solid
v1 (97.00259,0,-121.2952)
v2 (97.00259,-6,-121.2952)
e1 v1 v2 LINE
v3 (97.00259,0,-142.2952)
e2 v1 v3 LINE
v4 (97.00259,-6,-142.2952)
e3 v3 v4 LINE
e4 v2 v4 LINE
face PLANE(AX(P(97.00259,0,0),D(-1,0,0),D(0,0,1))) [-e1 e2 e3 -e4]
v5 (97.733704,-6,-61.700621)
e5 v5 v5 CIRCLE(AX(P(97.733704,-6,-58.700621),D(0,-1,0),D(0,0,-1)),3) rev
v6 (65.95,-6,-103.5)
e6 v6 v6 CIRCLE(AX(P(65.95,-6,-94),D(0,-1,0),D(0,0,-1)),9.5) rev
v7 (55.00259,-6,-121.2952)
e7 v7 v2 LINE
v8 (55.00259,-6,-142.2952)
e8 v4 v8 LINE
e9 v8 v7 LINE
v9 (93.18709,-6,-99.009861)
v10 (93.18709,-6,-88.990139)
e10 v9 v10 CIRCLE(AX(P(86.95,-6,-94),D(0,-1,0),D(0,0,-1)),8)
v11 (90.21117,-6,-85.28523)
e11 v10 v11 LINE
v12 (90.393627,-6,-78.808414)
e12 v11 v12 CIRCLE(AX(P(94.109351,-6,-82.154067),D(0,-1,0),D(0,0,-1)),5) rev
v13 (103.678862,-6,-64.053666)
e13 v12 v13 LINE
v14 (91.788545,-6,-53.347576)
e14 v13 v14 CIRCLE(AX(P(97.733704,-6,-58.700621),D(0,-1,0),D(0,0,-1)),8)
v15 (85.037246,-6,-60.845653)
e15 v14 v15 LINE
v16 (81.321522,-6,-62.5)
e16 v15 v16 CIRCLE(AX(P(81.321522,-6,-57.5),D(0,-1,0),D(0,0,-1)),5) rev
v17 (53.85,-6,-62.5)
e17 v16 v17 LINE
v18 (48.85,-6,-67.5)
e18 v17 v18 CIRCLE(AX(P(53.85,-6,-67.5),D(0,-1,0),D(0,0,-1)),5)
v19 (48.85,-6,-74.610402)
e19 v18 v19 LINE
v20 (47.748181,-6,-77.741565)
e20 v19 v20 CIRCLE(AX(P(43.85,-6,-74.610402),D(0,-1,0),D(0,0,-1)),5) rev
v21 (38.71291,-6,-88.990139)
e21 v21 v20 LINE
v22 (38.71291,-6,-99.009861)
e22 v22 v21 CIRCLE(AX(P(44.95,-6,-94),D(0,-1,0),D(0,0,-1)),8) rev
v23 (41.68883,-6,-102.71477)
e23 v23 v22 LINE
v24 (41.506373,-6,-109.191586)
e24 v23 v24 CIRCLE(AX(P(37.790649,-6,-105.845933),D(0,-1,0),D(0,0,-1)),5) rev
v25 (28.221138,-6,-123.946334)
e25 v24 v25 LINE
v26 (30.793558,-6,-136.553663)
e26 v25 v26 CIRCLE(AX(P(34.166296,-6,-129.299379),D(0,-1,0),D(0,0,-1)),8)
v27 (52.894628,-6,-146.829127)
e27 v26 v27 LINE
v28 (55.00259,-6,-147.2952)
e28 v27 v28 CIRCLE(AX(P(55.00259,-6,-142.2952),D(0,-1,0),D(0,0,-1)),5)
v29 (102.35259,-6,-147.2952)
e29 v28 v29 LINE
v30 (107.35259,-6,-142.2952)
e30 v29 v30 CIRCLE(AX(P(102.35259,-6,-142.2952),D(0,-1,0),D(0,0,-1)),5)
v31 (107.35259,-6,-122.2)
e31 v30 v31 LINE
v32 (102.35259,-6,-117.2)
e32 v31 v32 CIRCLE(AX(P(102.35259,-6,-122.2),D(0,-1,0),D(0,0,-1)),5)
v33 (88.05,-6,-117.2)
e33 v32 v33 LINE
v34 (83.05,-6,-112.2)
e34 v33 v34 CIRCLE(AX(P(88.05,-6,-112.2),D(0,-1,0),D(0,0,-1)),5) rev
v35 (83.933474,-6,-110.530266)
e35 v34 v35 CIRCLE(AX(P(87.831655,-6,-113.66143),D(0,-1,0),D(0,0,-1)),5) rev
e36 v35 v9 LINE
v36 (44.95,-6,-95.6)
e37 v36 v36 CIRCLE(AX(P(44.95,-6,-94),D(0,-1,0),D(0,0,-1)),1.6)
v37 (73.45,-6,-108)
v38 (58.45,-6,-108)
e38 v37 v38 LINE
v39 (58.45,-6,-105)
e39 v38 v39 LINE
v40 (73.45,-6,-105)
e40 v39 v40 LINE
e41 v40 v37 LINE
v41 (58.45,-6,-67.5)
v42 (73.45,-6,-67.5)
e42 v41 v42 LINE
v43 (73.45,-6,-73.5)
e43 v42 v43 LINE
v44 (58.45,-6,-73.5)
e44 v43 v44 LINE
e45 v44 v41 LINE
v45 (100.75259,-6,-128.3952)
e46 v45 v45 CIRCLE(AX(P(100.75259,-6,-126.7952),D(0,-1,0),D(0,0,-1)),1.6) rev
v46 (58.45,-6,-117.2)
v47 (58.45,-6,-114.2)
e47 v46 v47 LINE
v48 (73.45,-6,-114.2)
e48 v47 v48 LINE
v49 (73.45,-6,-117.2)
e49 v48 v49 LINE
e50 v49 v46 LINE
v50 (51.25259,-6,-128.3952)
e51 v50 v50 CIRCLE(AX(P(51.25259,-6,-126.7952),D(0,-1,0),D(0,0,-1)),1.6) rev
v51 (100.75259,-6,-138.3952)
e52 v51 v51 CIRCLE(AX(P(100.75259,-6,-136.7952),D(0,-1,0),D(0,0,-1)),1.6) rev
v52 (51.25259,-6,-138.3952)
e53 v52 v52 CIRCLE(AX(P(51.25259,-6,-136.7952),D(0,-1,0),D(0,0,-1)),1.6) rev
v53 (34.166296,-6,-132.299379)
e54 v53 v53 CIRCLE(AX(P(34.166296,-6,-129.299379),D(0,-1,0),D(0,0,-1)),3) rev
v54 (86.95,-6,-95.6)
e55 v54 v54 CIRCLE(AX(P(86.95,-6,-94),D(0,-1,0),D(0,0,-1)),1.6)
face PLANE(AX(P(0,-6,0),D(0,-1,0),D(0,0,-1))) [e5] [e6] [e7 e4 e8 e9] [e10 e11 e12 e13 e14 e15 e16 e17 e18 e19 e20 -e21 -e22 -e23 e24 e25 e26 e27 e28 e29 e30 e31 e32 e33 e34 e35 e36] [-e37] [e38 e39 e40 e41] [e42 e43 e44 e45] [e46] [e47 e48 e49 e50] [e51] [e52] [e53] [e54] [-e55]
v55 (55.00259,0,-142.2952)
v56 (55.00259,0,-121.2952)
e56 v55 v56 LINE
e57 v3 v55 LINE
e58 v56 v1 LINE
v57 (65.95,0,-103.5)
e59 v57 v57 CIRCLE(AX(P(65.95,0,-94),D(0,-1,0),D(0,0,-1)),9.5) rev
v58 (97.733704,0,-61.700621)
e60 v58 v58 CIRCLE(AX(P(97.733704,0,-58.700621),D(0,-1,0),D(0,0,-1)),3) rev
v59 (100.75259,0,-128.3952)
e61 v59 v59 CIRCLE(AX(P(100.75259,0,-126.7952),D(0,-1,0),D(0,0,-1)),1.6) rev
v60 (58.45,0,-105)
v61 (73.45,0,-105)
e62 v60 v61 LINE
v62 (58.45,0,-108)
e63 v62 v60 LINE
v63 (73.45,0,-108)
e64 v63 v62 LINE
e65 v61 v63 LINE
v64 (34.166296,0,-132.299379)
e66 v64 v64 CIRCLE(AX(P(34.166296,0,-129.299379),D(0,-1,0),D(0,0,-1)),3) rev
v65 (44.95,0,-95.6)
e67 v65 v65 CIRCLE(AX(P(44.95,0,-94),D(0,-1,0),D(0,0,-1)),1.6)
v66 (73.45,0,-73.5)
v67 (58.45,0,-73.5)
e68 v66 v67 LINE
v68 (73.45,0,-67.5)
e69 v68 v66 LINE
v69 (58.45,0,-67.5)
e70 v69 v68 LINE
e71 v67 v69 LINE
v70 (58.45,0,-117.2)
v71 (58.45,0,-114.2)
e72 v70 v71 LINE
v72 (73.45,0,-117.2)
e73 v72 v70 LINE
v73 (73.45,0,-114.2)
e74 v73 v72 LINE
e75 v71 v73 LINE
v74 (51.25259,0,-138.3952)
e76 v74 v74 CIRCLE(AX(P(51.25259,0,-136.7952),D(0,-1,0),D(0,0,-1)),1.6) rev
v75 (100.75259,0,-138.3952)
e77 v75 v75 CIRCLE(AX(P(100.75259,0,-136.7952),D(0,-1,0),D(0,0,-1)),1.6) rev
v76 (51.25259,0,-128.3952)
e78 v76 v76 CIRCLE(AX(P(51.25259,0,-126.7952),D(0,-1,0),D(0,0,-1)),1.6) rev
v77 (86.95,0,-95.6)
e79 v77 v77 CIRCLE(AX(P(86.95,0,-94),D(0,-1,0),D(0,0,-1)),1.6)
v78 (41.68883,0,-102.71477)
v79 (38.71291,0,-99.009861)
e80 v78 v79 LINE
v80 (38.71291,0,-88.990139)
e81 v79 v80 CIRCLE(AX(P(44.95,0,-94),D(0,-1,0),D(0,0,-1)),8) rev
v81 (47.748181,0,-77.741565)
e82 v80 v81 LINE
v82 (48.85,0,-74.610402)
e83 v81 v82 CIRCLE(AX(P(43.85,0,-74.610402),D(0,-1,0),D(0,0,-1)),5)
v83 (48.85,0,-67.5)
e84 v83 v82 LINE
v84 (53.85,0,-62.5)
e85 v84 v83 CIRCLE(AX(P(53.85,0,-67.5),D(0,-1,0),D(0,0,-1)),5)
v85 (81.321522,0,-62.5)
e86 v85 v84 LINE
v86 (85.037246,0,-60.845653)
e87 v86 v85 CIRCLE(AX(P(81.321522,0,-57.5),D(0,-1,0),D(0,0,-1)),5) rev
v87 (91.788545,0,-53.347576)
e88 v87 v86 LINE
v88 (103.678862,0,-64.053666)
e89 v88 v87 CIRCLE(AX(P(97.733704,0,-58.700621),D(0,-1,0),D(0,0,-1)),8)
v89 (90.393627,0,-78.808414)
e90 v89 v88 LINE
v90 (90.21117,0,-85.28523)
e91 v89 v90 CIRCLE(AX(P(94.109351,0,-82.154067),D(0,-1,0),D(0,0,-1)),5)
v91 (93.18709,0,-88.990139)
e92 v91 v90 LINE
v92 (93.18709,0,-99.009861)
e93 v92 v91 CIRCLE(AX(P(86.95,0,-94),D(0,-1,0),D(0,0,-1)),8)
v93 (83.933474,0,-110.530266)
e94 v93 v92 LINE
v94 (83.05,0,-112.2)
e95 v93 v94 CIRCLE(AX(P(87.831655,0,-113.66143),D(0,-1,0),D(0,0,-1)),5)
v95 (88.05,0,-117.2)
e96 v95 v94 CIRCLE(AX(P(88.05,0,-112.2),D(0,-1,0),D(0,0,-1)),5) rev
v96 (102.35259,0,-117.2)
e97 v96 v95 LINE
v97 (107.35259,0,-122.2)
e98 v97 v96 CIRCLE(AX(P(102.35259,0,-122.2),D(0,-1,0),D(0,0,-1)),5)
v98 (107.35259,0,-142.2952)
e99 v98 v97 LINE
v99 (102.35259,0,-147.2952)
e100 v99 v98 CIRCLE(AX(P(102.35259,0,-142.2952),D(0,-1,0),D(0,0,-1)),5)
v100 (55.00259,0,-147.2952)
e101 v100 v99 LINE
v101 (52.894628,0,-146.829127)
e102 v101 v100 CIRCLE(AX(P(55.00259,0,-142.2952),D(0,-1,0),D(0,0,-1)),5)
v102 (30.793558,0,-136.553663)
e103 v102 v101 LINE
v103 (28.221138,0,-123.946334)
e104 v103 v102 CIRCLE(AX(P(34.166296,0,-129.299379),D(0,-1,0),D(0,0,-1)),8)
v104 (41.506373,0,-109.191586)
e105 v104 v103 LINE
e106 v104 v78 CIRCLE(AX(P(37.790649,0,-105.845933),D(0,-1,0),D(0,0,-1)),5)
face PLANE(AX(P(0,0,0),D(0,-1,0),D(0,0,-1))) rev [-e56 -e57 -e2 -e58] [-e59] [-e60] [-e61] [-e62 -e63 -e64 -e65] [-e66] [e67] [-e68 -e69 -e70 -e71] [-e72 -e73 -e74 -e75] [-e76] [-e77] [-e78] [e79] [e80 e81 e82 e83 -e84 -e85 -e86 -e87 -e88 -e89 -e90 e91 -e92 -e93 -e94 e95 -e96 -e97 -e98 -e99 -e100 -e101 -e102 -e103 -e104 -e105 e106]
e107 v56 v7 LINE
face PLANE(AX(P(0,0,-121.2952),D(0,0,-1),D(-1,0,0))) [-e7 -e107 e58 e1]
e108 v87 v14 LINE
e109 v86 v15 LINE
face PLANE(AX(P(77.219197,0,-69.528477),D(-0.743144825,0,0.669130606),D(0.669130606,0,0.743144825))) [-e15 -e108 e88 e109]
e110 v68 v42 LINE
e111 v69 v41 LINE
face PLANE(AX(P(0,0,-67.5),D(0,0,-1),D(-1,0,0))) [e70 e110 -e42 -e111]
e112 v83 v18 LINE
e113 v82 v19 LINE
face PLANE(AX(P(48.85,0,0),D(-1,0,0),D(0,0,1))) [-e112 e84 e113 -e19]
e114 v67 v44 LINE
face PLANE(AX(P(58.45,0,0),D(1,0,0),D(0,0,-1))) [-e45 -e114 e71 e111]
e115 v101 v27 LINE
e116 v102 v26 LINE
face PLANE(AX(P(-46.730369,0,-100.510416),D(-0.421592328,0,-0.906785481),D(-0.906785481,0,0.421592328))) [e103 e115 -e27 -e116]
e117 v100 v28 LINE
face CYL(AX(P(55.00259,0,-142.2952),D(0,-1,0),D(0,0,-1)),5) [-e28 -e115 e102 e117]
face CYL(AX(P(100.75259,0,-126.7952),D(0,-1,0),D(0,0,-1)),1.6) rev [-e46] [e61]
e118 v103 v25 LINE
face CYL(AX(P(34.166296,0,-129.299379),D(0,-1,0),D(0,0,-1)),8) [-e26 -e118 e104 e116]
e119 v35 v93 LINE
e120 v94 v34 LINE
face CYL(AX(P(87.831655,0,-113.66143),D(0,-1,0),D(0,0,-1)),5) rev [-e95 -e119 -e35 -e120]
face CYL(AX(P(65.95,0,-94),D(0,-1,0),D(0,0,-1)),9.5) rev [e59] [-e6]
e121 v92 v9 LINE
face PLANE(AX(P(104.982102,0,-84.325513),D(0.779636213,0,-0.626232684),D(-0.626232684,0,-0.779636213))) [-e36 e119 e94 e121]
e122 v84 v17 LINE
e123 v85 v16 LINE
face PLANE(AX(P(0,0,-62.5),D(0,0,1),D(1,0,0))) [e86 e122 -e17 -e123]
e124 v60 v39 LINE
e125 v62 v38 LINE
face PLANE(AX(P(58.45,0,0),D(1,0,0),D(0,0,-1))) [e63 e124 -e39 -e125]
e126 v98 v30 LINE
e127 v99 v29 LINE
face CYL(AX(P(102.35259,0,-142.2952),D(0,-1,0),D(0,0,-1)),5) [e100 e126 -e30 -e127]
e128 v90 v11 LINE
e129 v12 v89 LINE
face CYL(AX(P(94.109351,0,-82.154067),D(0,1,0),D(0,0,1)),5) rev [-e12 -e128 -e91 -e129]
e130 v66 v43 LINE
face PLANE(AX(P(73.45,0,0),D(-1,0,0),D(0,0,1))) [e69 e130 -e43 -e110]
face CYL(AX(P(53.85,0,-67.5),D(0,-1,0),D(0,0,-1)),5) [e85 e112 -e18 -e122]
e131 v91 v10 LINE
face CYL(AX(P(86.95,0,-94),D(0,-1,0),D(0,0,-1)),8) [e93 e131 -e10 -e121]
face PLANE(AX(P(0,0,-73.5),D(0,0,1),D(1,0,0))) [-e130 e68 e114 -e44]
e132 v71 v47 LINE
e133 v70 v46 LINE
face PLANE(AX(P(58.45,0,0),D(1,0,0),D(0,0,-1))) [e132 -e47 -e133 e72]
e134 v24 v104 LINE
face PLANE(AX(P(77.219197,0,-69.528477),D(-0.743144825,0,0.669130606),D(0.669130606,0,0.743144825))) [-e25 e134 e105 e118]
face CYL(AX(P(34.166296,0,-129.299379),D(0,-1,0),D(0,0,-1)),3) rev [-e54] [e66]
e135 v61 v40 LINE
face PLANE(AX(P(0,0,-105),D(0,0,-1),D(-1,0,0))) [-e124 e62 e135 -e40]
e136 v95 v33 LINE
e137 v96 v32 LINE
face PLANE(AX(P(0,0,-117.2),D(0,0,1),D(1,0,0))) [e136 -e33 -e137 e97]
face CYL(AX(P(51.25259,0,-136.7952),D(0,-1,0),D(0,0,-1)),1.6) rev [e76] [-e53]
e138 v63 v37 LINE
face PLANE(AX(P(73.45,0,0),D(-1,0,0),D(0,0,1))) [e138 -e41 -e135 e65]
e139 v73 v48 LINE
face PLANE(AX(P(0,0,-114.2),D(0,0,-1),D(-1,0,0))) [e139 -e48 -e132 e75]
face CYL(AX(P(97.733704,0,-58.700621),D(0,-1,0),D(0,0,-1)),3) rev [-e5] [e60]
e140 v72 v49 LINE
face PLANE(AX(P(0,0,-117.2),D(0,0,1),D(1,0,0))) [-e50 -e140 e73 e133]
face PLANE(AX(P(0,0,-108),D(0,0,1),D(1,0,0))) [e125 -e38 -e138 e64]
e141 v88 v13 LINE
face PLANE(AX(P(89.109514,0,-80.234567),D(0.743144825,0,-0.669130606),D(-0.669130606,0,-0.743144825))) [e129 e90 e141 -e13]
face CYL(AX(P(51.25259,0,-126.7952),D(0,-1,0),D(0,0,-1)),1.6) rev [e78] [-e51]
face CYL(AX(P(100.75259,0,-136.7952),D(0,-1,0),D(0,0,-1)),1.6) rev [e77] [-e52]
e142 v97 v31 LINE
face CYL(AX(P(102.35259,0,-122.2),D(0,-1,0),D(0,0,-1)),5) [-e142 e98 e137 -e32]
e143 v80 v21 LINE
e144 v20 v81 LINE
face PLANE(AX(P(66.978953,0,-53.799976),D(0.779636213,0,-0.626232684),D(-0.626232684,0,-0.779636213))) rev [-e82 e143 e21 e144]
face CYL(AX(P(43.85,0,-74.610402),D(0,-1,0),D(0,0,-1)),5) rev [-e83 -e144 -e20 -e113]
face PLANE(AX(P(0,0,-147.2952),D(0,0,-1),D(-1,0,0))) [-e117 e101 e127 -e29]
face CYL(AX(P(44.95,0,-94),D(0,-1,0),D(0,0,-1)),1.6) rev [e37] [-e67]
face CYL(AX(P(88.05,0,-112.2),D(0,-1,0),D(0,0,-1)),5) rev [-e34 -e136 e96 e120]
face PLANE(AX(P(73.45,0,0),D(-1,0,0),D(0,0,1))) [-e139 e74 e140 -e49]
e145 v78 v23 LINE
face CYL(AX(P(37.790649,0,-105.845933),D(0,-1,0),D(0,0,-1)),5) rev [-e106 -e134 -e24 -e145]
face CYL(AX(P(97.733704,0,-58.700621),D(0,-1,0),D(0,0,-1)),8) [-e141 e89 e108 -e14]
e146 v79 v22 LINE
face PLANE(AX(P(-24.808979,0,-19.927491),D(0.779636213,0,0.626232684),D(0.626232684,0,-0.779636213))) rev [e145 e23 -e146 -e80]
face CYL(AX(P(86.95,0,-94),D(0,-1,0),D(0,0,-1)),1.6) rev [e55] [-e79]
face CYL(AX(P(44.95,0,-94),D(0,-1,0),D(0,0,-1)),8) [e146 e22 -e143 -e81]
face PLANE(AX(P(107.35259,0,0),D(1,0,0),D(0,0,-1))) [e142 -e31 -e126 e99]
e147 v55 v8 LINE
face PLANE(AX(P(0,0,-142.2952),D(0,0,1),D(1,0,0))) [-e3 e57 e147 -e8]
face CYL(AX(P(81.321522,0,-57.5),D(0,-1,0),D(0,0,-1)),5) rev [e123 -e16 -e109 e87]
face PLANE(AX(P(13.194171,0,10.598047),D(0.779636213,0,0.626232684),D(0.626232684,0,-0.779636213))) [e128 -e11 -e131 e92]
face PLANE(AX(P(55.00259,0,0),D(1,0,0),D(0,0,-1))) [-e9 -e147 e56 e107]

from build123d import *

# Parameters (mm, degrees)
ESBO_O1_R                = 3
ESBO_O1_R_2              = 1.6
ESBO_O1_W                = 15
ESBO_O1_H                = 3
ESBO_O1_W_2              = 42
ESBO_O1_H_2              = 21
ESBO_O1_R_3              = 9.5
ESBO_O1_H_3              = 6
RESSALTO_EXTRUS_O1_DEPTH = 6
FILETE1_R                = 5


with BuildPart() as part:
    # Esboço1 → Ressalto-extrusão1 (new body)
    with BuildSketch(Plane.XZ.offset(6)):
        with BuildLine():
            ThreePointArc((28.221137594, -123.946334359), (26.32780231, -130.898758331), (30.793557575, -136.55366306))
            Line((30.793557575, -136.55366306), (52.89462836, -146.829127406))
            ThreePointArc((52.89462836, -146.829127406), (53.923154275, -147.177291613), (55.00259, -147.2952))
            Line((55.00259, -147.2952), (102.35259, -147.2952))
            ThreePointArc((102.35259, -147.2952), (105.888123906, -145.830733906), (107.35259, -142.2952))
            Line((107.35259, -142.2952), (107.35259, -122.2))
            ThreePointArc((107.35259, -122.2), (105.888123906, -118.664466094), (102.35259, -117.2))
            Line((102.35259, -117.2), (88.05, -117.2))
            ThreePointArc((88.05, -117.2), (84.514466094, -115.735533906), (83.05, -112.2))
            Line((83.05, -112.2), (83.05, -111.6301581))
            Line((83.05, -111.6301581), (93.187089706, -99.009861475))
            ThreePointArc((93.187089706, -99.009861475), (94.95, -94), (93.187089706, -88.990138525))
            Line((93.187089706, -88.990138525), (87.547626436, -81.969218188))
            Line((87.547626436, -81.969218188), (103.678862406, -64.053665641))
            ThreePointArc((103.678862406, -64.053665641), (103.086748653, -52.755462186), (91.788545198, -53.347575939))
            Line((91.788545198, -53.347575939), (85.037246259, -60.845653032))
            ThreePointArc((85.037246259, -60.845653032), (83.355205347, -62.067727288), (81.321522132, -62.5))
            Line((81.321522132, -62.5), (53.85, -62.5))
            ThreePointArc((53.85, -62.5), (50.314466094, -63.964466094), (48.85, -67.5))
            Line((48.85, -67.5), (48.85, -76.3698419))
            Line((48.85, -76.3698419), (38.712910294, -88.990138525))
            ThreePointArc((38.712910294, -88.990138525), (36.95, -94), (38.712910294, -99.009861475))
            Line((38.712910294, -99.009861475), (44.352373564, -106.030781812))
            Line((44.352373564, -106.030781812), (28.221137594, -123.946334359))
        make_face()
        with Locations(Location((34.166296198, -129.29937921, 0), (0, 0, 270))):
            Circle(ESBO_O1_R, mode=Mode.SUBTRACT)
        with Locations(Location((51.25259, -136.7952, 0), (0, 0, 270))):
            Circle(ESBO_O1_R_2, mode=Mode.SUBTRACT)
        with Locations(Location((51.25259, -126.7952, 0), (0, 0, 270))):
            Circle(ESBO_O1_R_2, mode=Mode.SUBTRACT)
        with Locations((65.95, -115.7)):
            Rectangle(ESBO_O1_W, ESBO_O1_H, mode=Mode.SUBTRACT)
        with Locations((65.95, -106.5)):
            Rectangle(ESBO_O1_W, ESBO_O1_H, mode=Mode.SUBTRACT)
        with Locations((76.00259, -131.7952)):
            Rectangle(ESBO_O1_W_2, ESBO_O1_H_2, mode=Mode.SUBTRACT)
        with Locations(Location((100.75259, -136.7952, 0), (0, 0, 270))):
            Circle(ESBO_O1_R_2, mode=Mode.SUBTRACT)
        with Locations(Location((100.75259, -126.7952, 0), (0, 0, 270))):
            Circle(ESBO_O1_R_2, mode=Mode.SUBTRACT)
        with Locations(Location((65.95, -94, 0), (0, 0, 270))):
            Circle(ESBO_O1_R_3, mode=Mode.SUBTRACT)
        with Locations((65.95, -70.5)):
            Rectangle(ESBO_O1_W, ESBO_O1_H_3, mode=Mode.SUBTRACT)
        with Locations(Location((97.733703802, -58.70062079, 0), (0, 0, 270))):
            Circle(ESBO_O1_R, mode=Mode.SUBTRACT)
        with Locations(Location((44.95, -94, 0), (0, 0, 270))):
            Circle(ESBO_O1_R_2, mode=Mode.SUBTRACT)
        with Locations(Location((86.95, -94, 0), (0, 0, 270))):
            Circle(ESBO_O1_R_2, mode=Mode.SUBTRACT)
    extrude(amount=-RESSALTO_EXTRUS_O1_DEPTH)

    # Filete1
    # the kernel refuses this fillet: 5 mm, written as the material it adds along each edge
    with BuildSketch(Plane(origin=(83.05, -6, -111.6301581), x_dir=(0, 0, -1), z_dir=(0, 1, 0))) as filete1_piece_1:
        with BuildLine():
            CenterArc((2.031271709, -4.78165483), FILETE1_R, 106.994862895, 21.777857611)
            Line((-1.099891712, -0.883473763), (-1.162514981, -0.805510142))
            Line((-1.162514981, -0.805510142), (-0.062623268, 0.077963621))
            Line((-0.062623268, 0.077963621), (0, 0.1))
            ThreePointArc((0, 0.1), (0.28492095, 0.1), (0.540613304, 0.095633097))
            Line((0.540613304, 0.095633097), (0.5698419, 0))
        make_face()
    extrude(amount=6)
    with BuildSketch(Plane(origin=(87.547626436, -6, -81.969218188), x_dir=(0.626232684317403, 0, -0.7796362133024736), z_dir=(0, 1, 0)), Plane(origin=(44.352373564, -6, -106.030781812), x_dir=(-0.6262326843177314, 0, 0.7796362133022096), z_dir=(0, 1, 0))) as filete1_piece_2:
        with BuildLine():
            CenterArc((FILETE1_R * 0.85065630428, -FILETE1_R), FILETE1_R, 90, 80.772720506)
            Line((-FILETE1_R * 0.136403726762, -FILETE1_R * 0.839648838109), (-FILETE1_R * 0.156144927382, -FILETE1_R * 0.836441814871))
            Line((-FILETE1_R * 0.156144927382, -FILETE1_R * 0.836441814871), (-FILETE1_R * 0.0170131260856, FILETE1_R * 0.02))
            Line((-FILETE1_R * 0.0170131260856, FILETE1_R * 0.02), (FILETE1_R * 0.85065630428, FILETE1_R * 0.02))
            Line((FILETE1_R * 0.85065630428, FILETE1_R * 0.02), (FILETE1_R * 0.85065630428, 0))
        make_face()
    extrude(amount=6)
    with BuildSketch(Plane(origin=(48.85, -6, -76.3698419), x_dir=(0, 0, 1), z_dir=(0, 1, 0))) as filete1_piece_3:
        with BuildLine():
            CenterArc((FILETE1_R * 0.351888031743, -FILETE1_R), FILETE1_R, 90, 38.772720506)
            Line((-FILETE1_R * 0.274344652575, -FILETE1_R * 0.220363786698), (-FILETE1_R * 0.286869306261, -FILETE1_R * 0.204771062432))
            Line((-FILETE1_R * 0.286869306261, -FILETE1_R * 0.204771062432), (-FILETE1_R * 0.00703776063486, FILETE1_R * 0.02))
            Line((-FILETE1_R * 0.00703776063486, FILETE1_R * 0.02), (FILETE1_R * 0.351888031743, FILETE1_R * 0.02))
            Line((FILETE1_R * 0.351888031743, FILETE1_R * 0.02), (FILETE1_R * 0.351888031743, 0))
        make_face()
    extrude(amount=6)


solid = part.part
